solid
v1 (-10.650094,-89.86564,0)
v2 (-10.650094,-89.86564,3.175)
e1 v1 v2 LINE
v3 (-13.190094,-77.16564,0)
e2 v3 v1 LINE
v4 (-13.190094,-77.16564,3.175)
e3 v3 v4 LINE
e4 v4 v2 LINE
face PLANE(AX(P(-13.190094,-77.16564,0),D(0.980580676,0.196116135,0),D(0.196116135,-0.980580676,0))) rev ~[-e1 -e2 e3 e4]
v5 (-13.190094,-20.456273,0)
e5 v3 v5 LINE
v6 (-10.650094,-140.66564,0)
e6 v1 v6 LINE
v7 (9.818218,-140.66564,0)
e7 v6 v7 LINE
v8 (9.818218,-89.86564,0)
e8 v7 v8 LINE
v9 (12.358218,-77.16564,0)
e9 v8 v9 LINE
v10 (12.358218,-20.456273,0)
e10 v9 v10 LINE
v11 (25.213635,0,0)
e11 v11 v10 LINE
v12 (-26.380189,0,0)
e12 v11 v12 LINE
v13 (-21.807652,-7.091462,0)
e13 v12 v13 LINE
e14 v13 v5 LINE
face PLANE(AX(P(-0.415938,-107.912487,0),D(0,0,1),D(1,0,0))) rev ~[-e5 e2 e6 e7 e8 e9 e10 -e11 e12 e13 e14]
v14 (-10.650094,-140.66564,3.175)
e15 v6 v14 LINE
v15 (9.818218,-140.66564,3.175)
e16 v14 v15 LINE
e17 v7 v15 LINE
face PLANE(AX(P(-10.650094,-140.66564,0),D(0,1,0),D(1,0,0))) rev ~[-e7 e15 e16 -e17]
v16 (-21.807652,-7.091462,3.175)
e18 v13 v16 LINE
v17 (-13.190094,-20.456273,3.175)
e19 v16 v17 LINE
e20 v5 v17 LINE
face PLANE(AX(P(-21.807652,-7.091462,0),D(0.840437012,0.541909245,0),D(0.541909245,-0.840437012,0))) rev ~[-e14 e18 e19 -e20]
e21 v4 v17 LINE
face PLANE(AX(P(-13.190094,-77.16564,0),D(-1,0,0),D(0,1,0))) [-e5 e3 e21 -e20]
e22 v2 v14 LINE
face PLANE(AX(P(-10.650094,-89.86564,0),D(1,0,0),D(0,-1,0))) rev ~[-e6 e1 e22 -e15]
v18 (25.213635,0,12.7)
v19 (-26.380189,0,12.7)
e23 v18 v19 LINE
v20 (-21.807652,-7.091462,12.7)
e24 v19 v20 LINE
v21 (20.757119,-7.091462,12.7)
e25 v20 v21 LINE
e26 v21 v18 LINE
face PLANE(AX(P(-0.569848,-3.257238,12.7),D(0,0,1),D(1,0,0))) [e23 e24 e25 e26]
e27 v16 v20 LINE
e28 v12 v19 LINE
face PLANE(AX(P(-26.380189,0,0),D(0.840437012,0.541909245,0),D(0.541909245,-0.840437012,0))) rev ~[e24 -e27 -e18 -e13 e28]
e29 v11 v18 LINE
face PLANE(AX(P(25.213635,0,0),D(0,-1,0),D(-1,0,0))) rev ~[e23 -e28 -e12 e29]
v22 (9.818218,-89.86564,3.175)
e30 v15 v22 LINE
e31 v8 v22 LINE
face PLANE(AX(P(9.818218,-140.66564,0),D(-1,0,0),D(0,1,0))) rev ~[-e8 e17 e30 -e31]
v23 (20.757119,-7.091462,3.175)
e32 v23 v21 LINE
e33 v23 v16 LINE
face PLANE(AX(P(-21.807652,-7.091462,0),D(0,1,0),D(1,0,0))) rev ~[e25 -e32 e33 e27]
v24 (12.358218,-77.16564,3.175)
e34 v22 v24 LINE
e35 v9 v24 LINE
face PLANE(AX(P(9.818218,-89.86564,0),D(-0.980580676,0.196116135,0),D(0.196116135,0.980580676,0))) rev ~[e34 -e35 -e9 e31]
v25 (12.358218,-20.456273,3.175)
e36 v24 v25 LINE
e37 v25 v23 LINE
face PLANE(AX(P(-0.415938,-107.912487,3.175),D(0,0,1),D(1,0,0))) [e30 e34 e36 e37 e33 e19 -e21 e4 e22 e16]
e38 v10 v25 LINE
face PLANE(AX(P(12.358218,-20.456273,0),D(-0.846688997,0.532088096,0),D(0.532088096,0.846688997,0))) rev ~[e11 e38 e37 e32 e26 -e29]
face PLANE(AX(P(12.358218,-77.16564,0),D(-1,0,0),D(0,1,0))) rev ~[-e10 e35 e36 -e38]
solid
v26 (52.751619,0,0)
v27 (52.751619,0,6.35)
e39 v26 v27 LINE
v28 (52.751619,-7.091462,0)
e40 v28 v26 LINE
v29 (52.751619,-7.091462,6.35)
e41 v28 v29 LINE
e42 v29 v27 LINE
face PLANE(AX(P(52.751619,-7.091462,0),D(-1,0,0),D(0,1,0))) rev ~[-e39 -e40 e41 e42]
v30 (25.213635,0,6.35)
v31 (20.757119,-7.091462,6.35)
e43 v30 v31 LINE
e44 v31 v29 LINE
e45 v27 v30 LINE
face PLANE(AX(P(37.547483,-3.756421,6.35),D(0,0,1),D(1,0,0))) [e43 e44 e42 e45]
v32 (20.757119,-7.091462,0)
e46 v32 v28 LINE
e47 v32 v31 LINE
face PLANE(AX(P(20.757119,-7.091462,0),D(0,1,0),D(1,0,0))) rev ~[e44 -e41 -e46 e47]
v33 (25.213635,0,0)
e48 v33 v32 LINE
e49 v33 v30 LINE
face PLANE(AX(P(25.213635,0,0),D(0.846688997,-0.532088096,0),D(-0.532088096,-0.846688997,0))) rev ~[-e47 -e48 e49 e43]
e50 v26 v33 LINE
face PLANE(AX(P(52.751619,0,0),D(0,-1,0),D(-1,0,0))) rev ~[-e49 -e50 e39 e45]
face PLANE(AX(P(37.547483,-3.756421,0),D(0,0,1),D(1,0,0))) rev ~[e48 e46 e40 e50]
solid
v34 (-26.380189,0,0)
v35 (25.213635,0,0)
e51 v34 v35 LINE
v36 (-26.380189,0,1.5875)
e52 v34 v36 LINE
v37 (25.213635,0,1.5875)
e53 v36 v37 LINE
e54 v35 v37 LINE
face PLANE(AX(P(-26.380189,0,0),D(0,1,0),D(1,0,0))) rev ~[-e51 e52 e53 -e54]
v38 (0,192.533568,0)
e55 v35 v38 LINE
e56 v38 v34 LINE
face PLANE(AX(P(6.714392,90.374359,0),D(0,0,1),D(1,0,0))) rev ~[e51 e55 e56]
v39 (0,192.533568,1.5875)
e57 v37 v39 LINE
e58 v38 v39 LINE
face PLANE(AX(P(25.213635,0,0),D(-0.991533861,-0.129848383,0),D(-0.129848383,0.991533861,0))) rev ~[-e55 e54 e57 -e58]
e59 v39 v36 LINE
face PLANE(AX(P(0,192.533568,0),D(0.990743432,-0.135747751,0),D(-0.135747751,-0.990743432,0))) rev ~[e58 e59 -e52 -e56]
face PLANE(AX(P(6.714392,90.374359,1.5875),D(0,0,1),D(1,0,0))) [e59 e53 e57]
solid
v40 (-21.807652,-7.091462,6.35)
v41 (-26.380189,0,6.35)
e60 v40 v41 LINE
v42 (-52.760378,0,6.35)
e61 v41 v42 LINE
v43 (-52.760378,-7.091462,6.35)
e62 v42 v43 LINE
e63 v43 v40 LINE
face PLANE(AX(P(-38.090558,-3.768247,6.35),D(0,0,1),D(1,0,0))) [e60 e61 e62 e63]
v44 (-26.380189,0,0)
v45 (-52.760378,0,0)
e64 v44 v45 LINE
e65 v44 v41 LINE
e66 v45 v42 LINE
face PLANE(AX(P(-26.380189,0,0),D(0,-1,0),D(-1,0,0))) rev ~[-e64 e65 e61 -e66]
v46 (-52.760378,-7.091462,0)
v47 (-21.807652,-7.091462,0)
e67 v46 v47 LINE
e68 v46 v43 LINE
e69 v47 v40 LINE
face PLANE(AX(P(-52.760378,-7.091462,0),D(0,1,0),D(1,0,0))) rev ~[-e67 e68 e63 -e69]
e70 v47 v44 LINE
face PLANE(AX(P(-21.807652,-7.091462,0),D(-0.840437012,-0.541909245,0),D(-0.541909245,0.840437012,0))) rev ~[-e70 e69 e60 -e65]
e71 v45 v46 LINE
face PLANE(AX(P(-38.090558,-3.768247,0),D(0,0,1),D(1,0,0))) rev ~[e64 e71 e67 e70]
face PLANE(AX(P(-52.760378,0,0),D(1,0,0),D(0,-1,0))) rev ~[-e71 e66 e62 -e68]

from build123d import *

# Parameters (mm, degrees)
F1_DEPTH = 1.5875
F2_DEPTH = 6.35
F3_DEPTH = 12.7
F0_W     = 25.548312813
F0_H     = 56.7093666971
F4_DEPTH = 3.175


# Not quite as in the source:
# - a length typed as a fraction of an inch, garbled in the dataset ("3 / 203.2 mm" for 3/8 in), is restored


with BuildPart() as f1:
    # F0 (on Top) → F1 (new body)
    with BuildSketch(Plane.XY):
        Polygon((0, 192.5335675478), (0, 0), (25.2136345953, 0), align=None)
        Polygon((-26.3801887631, 0), (0, 0), (0, 192.5335675478), align=None)
    extrude(amount=F1_DEPTH)


with BuildPart() as f2:
    # F0 (on Top) → F2 (new body)
    with BuildSketch(Plane.XY):
        Polygon((52.7516193688, 0), (25.2136345953, 0), (20.757119148, -7.0914621465), (52.7516193688, -7.0914621465), align=None)
    extrude(amount=F2_DEPTH)


with BuildPart() as f2b:
    # F0 (on Top) → F2, piece 2 (new body)
    with BuildSketch(Plane.XY):
        Polygon((-21.8076522841, -7.0914621465), (-26.3801887631, 0), (-52.7603775263, 0), (-52.7603775263, -7.0914621465), align=None)
    extrude(amount=F2_DEPTH)


with BuildPart() as f3:
    # F0 (on Top) → F3 (new body)
    with BuildSketch(Plane.XY):
        Polygon((25.2136345953, 0), (0, 0), (-26.3801887631, 0), (-21.8076522841, -7.0914621465), (20.757119148, -7.0914621465), align=None)
    extrude(amount=F3_DEPTH)

    # F0 (on Top) → F4 (join)
    with BuildSketch(Plane.XY):
        Polygon((12.3582184315, -77.1656398058), (-13.1900943816, -77.1656398058), (-10.6500943816, -89.8656398058), (-10.6500943816, -140.6656398058), (9.8182184315, -140.6656398058), (9.8182184315, -89.8656398058), align=None)
        with Locations((-0.415937975, -48.8109564573)):
            Rectangle(F0_W, F0_H)
        Polygon((20.757119148, -7.0914621465), (-21.8076522841, -7.0914621465), (-13.1900943816, -20.4562731087), (12.3582184315, -20.4562731087), align=None)
    extrude(amount=F4_DEPTH)


solid = Compound([f1.part, f2.part, f2b.part, f3.part])
